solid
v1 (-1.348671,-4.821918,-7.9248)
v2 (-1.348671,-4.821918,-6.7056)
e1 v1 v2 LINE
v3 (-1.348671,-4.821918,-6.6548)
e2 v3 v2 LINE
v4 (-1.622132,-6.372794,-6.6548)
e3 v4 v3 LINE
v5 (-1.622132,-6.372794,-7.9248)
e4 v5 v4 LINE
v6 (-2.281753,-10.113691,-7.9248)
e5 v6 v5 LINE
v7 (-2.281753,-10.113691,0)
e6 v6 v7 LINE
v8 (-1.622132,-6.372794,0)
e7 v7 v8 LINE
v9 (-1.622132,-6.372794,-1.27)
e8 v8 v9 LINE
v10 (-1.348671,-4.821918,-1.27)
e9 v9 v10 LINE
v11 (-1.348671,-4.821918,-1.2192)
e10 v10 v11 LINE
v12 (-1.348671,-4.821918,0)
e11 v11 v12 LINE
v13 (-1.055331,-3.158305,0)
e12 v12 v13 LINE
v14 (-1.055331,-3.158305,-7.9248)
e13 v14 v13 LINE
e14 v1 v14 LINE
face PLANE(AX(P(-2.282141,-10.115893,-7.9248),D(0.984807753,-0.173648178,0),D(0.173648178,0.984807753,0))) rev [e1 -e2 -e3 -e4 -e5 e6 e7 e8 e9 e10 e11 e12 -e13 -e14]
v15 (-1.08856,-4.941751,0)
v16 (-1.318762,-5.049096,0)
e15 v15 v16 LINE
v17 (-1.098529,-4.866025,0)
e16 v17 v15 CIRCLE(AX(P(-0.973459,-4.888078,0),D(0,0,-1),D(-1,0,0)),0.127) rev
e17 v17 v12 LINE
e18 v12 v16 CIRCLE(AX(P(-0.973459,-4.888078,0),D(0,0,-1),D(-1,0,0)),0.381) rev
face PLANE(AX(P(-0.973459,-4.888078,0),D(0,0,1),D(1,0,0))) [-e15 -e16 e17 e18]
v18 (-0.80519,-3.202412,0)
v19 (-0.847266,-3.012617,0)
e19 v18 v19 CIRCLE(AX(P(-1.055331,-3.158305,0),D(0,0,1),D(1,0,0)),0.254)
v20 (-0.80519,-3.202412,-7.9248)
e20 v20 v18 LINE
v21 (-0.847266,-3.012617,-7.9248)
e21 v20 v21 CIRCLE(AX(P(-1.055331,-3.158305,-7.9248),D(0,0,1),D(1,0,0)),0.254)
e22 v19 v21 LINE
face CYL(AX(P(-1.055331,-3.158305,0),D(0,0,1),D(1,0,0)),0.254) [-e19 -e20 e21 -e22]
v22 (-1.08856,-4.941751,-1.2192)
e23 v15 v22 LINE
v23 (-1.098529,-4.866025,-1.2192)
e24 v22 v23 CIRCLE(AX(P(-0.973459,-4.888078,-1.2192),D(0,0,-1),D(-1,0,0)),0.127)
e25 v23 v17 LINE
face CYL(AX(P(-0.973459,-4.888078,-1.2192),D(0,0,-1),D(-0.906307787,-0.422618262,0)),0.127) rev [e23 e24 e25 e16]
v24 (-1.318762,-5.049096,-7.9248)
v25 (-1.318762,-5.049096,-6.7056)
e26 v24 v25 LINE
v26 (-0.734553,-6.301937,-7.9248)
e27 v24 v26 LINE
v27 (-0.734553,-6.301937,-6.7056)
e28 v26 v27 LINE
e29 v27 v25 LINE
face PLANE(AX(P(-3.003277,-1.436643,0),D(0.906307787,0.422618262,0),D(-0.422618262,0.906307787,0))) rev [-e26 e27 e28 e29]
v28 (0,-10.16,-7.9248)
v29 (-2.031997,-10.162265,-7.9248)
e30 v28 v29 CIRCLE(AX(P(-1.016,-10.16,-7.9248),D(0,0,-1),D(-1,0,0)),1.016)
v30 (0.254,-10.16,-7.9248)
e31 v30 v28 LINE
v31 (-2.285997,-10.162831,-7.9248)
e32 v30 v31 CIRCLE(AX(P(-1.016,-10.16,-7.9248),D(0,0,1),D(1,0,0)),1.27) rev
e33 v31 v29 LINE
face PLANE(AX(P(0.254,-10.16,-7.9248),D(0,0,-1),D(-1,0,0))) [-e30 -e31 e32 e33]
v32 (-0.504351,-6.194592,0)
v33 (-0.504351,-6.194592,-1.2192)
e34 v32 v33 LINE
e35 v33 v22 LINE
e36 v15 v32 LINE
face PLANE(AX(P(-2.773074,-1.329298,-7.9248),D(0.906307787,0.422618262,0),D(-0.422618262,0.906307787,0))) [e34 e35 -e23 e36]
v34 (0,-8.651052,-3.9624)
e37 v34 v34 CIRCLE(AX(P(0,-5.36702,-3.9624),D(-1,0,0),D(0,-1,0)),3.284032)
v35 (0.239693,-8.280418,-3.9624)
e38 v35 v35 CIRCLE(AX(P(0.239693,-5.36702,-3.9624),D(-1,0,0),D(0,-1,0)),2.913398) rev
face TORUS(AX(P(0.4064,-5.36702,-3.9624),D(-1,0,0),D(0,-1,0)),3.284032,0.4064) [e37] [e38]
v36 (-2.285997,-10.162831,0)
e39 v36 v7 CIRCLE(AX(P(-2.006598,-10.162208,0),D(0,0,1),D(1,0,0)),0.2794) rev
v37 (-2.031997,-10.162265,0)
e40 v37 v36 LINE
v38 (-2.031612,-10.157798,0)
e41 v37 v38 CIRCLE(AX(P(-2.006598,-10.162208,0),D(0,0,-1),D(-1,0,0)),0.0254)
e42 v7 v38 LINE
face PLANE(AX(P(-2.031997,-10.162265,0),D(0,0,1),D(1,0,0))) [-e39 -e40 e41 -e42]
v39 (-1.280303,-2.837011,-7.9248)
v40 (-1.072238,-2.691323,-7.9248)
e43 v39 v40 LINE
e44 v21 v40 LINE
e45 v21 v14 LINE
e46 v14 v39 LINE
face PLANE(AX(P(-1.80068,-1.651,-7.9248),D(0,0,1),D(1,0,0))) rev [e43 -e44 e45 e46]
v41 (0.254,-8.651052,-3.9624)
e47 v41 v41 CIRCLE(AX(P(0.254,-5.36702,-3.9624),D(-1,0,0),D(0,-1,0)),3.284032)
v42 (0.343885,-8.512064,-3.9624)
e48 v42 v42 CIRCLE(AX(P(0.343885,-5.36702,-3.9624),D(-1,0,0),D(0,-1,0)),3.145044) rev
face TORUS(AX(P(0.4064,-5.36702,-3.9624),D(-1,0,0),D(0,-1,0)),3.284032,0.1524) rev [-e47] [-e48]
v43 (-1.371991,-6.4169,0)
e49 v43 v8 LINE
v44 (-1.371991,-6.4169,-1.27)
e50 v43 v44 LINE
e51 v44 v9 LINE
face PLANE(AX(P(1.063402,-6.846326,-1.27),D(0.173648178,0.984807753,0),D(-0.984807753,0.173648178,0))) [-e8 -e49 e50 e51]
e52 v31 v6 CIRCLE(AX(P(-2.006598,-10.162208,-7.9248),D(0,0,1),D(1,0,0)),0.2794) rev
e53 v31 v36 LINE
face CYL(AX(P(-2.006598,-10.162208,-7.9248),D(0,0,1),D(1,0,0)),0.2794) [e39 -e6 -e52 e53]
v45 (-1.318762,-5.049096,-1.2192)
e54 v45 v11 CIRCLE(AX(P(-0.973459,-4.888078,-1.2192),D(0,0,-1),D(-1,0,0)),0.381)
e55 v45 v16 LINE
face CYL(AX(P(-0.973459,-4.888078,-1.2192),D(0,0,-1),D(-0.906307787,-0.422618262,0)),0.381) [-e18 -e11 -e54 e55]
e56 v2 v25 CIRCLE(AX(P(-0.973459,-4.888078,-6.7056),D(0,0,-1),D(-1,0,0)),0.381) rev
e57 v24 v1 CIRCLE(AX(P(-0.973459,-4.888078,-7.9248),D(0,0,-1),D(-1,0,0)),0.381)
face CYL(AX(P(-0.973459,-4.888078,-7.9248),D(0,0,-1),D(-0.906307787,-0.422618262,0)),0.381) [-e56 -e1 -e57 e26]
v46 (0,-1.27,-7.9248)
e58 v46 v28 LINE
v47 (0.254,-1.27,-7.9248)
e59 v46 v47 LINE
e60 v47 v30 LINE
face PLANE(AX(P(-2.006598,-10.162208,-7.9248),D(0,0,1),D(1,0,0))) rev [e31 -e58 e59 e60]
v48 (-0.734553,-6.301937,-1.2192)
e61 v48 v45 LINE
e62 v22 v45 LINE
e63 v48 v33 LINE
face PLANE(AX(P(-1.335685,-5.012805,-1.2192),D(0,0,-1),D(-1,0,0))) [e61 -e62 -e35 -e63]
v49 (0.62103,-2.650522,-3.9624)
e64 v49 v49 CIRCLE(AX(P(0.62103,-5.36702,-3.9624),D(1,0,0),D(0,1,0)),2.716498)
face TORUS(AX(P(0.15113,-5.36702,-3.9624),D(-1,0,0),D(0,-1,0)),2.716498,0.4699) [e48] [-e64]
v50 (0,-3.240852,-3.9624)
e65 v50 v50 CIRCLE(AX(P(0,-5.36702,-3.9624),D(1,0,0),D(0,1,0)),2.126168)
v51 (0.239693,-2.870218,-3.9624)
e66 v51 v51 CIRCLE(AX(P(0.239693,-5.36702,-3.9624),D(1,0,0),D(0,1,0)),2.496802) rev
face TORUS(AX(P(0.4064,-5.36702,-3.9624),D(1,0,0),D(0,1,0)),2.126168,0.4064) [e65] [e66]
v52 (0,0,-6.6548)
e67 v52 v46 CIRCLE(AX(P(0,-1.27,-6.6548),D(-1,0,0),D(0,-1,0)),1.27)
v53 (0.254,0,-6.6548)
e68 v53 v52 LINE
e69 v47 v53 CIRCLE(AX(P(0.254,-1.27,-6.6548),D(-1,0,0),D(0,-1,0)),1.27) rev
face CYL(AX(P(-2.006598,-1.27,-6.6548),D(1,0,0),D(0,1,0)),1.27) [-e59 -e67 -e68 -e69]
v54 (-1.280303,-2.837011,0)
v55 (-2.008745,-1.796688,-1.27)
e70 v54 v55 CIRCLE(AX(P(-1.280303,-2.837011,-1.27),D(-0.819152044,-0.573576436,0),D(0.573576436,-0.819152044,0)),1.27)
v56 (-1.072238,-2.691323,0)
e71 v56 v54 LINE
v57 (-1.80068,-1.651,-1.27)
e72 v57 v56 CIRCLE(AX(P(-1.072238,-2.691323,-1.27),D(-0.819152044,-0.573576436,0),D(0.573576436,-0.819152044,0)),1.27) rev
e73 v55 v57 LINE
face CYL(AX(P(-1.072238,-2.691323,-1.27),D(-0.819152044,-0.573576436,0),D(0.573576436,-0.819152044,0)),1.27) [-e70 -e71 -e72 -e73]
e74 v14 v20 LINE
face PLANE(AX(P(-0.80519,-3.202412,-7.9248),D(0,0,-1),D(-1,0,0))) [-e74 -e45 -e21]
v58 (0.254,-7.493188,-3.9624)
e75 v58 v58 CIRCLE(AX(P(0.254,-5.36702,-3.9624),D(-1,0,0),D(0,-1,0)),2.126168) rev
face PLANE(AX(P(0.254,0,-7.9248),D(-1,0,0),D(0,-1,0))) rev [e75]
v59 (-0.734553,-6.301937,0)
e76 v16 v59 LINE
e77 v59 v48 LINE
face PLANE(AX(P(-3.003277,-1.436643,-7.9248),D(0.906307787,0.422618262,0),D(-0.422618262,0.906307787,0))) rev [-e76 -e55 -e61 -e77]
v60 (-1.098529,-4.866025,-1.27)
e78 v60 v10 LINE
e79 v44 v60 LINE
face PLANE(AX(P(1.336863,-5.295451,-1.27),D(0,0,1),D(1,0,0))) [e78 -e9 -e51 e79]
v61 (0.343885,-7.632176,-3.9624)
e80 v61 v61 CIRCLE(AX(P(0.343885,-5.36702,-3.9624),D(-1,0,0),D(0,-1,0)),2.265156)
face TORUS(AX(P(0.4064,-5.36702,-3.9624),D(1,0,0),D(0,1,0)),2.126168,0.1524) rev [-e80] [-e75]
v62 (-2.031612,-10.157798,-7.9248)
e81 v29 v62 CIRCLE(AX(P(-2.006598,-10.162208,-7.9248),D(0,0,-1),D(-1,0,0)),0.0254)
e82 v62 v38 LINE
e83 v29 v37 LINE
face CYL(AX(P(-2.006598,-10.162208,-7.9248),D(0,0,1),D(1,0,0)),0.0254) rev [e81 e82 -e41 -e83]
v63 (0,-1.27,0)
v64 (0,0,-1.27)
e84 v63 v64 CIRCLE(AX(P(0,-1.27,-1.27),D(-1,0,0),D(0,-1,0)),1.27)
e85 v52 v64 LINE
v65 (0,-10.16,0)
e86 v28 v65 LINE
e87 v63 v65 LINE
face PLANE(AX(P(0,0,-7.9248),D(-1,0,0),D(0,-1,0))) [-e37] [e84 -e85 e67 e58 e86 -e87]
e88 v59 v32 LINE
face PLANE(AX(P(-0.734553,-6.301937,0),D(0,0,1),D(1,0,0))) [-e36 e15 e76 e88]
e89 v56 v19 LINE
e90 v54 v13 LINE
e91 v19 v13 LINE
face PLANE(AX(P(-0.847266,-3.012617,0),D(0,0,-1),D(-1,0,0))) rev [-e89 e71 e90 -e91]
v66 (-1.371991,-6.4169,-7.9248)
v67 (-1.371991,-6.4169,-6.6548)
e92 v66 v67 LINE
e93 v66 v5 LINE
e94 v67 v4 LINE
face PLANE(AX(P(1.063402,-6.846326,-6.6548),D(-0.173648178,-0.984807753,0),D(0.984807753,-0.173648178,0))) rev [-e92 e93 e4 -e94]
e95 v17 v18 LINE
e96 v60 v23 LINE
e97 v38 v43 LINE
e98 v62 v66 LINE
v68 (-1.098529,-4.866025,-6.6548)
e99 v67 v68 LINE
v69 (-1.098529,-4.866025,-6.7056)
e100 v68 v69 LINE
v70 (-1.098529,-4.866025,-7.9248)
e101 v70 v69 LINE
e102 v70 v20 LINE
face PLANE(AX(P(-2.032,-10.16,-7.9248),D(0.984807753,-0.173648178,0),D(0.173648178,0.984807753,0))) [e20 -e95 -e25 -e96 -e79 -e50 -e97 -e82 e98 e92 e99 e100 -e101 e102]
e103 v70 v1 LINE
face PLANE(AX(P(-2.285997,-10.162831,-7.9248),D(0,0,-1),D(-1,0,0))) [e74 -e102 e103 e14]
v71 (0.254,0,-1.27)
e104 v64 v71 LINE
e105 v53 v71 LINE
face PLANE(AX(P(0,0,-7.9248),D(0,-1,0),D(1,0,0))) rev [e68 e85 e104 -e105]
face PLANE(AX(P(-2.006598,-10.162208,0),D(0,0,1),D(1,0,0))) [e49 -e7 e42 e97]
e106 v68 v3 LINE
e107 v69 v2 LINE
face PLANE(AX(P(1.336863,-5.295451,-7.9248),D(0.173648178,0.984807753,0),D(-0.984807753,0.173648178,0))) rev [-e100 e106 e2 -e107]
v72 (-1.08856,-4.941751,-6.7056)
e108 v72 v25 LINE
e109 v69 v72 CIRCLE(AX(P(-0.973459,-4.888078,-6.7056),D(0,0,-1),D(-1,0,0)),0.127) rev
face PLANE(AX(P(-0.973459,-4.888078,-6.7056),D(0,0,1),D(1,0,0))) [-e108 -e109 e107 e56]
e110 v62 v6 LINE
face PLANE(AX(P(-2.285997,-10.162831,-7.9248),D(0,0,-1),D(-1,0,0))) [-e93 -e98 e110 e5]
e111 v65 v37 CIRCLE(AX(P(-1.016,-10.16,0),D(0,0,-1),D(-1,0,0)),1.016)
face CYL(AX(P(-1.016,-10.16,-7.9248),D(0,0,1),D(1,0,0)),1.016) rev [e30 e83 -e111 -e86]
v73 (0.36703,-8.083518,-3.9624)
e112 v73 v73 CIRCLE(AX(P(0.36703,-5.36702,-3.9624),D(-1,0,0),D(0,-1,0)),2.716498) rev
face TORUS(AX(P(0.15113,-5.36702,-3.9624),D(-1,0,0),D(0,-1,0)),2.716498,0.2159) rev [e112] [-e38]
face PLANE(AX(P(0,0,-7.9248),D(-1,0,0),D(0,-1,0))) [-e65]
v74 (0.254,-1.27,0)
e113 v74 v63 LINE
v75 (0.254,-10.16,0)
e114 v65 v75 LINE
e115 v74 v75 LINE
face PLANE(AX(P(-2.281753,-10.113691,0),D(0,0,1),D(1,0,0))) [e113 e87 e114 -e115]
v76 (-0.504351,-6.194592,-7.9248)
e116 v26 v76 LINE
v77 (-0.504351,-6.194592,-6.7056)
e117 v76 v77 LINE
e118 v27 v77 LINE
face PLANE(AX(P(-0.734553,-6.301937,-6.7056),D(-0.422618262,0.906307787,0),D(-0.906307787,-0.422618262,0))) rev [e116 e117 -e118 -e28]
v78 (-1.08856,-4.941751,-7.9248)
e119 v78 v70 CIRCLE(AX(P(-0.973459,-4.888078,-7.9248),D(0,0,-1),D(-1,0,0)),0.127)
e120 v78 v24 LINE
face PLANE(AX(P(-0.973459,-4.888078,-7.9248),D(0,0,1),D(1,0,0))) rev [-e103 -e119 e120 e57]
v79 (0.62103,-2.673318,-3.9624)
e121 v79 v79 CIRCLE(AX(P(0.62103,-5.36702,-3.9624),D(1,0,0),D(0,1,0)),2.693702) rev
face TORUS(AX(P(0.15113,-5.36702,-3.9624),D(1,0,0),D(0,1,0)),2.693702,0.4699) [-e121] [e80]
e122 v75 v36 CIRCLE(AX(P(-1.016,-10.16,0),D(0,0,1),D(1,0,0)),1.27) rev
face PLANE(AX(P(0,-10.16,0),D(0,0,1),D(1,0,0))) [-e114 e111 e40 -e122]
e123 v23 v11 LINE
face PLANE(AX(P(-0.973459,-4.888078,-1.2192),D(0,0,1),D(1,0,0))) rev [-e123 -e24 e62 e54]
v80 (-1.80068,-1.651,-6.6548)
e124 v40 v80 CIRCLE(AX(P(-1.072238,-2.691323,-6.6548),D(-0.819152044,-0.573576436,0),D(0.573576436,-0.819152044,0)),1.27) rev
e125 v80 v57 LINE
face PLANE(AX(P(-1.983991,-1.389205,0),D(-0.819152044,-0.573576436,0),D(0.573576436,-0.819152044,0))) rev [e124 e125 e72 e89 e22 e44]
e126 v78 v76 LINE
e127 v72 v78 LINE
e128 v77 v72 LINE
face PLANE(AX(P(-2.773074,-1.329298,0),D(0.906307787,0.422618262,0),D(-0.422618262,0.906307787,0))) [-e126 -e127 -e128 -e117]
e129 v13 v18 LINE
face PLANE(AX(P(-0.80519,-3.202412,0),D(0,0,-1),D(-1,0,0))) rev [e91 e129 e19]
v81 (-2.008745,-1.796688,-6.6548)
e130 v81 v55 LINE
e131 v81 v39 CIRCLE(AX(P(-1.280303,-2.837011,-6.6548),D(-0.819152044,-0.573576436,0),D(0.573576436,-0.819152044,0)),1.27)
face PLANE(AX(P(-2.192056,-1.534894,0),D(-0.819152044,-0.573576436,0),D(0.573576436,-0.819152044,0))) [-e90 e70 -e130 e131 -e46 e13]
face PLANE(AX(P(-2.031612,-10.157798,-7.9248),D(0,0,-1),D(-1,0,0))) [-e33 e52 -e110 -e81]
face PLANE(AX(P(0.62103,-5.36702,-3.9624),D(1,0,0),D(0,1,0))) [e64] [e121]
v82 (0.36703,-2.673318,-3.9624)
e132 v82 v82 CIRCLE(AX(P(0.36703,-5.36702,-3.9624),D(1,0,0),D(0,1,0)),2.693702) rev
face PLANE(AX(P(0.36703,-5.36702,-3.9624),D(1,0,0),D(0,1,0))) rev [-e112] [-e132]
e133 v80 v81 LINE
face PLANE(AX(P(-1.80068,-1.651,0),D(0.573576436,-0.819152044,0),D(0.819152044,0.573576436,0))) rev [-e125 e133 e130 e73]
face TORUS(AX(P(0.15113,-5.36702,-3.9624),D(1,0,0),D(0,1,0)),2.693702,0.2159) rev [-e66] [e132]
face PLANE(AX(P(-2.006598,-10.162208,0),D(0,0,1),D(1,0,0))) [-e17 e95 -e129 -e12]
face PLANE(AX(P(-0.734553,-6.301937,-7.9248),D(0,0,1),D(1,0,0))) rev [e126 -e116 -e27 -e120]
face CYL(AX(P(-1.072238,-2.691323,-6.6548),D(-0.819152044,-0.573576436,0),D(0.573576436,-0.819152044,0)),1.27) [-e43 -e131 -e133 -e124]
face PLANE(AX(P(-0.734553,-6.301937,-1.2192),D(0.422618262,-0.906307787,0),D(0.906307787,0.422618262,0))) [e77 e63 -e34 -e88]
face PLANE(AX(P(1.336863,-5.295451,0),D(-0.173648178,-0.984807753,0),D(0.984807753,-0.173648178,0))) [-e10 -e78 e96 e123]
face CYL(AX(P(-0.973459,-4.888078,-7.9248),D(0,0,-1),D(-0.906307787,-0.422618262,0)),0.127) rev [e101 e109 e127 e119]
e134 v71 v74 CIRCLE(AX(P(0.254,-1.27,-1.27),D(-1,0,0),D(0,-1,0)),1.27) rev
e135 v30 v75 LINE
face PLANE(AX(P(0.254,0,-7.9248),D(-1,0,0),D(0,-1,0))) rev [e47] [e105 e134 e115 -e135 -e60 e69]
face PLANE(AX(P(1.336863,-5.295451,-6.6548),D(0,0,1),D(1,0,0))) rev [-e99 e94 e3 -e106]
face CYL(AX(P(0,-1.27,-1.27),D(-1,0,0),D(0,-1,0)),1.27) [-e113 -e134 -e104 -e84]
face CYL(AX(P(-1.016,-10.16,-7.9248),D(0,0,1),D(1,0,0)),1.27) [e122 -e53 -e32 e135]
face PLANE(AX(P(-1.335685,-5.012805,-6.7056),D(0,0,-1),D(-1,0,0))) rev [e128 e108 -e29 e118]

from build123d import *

# Parameters (mm, degrees)
BASE_FLANGE1_START  = -7.9248
BASE_FLANGE1_DEPTH  = 7.9248
EDGE_FLANGE1_START  = -7.9248
EDGE_FLANGE1_DEPTH  = 7.9248
FILLET1_R           = 1.27
CUT_EXTRUDE1_REACH  = 16.094
SKETCH9_W           = 1.27
SKETCH9_H           = 1.5748
EDGE_FLANGE2_DEPTH  = 1.2192
SKETCH13_R          = 3.175
SKETCH13_R_2        = 2.2352
BOSS_EXTRUDE1_DEPTH = 0.36703
FILLET2_R           = 0.4699
FILLET3_R           = 0.1524


# Read off the part's stored shape, not the designer's step: Base-Flange1, Edge-Flange1, SurfaceCut2
# Sheet-metal steps are written as plain solids
with BuildPart() as part:
    # Base-Flange1 outline → Base-Flange1 (new body)
    with BuildSketch(Plane.XY.offset(BASE_FLANGE1_START)):
        with BuildLine():
            ThreePointArc((-2.031997476, -10.162264875), (-2.031903336, -10.160022702), (-2.031611656, -10.157797589))
            Line((-2.031611656, -10.157797589), (-0.805189502, -3.202411927))
            Line((-0.805189502, -3.202411927), (-1.055330671, -3.15830529))
            Line((-1.055330671, -3.15830529), (-2.281752825, -10.113690952))
            ThreePointArc((-2.281752825, -10.113690952), (-2.284961307, -10.138167189), (-2.285996844, -10.162831094))
            ThreePointArc((-2.285996844, -10.162831094), (-1.014584452, -11.429999211), (0.254, -10.16))
            Line((0.254, -10.16), (0.254, 0))
            Line((0.254, 0), (0, 0))
            Line((0, 0), (0, -10.16))
            ThreePointArc((0, -10.16), (-1.014867562, -11.175999369), (-2.031997476, -10.162264875))
        make_face()
    extrude(amount=BASE_FLANGE1_DEPTH)

    # Edge-Flange1 outline → Edge-Flange1 (add)
    with BuildSketch(Plane.XY.offset(EDGE_FLANGE1_START)):
        with BuildLine():
            Line((-1.055330671, -3.15830529), (-0.805189502, -3.202411927))
            ThreePointArc((-0.805189502, -3.202411927), (-0.807351486, -3.103329628), (-0.847266052, -3.012616875))
            Line((-0.847266052, -3.012616875), (-1.800680468, -1.650999977))
            Line((-1.800680468, -1.650999977), (-2.008745087, -1.796688392))
            Line((-2.008745087, -1.796688392), (-1.055330671, -3.15830529))
        make_face()
    extrude(amount=EDGE_FLANGE1_DEPTH)

    # Fillet1
    fillet1_edges = [part.edges().sort_by_distance(p)[0] for p in [
        (0.127, 0, -7.9248),
        (-1.904712777, -1.723844184, -7.9248),
        (-1.904712777, -1.723844184, 0),
        (0.127, 0, 0),
    ]]
    fillet(fillet1_edges, radius=FILLET1_R)

    # Sketch9 → Cut-Extrude1 (cut, up to next)
    with BuildSketch(Plane(origin=(-0.483406544, 0.085237616, 0), x_dir=(0, 0, 1), z_dir=(-0.9848077530122094, 0.1736481776669234, 0)), mode=Mode.PRIVATE) as cut_extrude1_sk1:
        with Locations((-7.2898, -5.770256905)):
            Rectangle(SKETCH9_W, SKETCH9_H)
    cut_extrude1_tool1 = extrude(cut_extrude1_sk1.sketch, amount=-CUT_EXTRUDE1_REACH, mode=Mode.PRIVATE) & part.part
    cut_extrude1 = cut_extrude1_tool1.solids().sort_by_distance((-1.485401, -5.597356, -7.2898))[0]
    add(cut_extrude1, mode=Mode.SUBTRACT)

    # Edge-Flange2 section (across the edge) → Edge-Flange2 (add)
    with BuildSketch(Plane(origin=(-1.10548278, -4.905459737, -6.7056), x_dir=(0.9063077870366494, 0.42261826174070094, 0), z_dir=(0, 0, -1))):
        with BuildLine():
            Line((-0.254, 0.040042946), (-0.254, 1.4224))
            Line((-0.254, 1.4224), (0, 1.4224))
            Line((0, 1.4224), (0, 0.040042946))
            ThreePointArc((0, 0.040042946), (0.005877947, 0.00185331), (0.02296769, -0.032801261))
            Line((0.02296769, -0.032801261), (-0.185096929, -0.178489676))
            ThreePointArc((-0.185096929, -0.178489676), (-0.236366158, -0.074525963), (-0.254, 0.040042946))
        make_face()
    edge_flange2 = extrude(amount=EDGE_FLANGE2_DEPTH)

    # Mirror1: Cut-Extrude1, Edge-Flange2 across plane
    add(cut_extrude1.mirror(Plane(origin=(0, 0, -3.9624), x_dir=(1, 0, 0), z_dir=(0, 0, -1))), mode=Mode.SUBTRACT)
    add(edge_flange2.mirror(Plane(origin=(0, 0, -3.9624), x_dir=(1, 0, 0), z_dir=(0, 0, -1))))

    # Sketch13 → Boss-Extrude1 (add)
    with BuildSketch(Plane(origin=(0.254, 0, 0), x_dir=(0, 0, -1), z_dir=(1, 0, 0))):
        with Locations(Location((3.9624, -5.36702, 0), (0, 0, 270))):
            Circle(SKETCH13_R)
        with Locations(Location((3.9624, -5.36702, 0), (0, 0, 90))):
            Circle(SKETCH13_R_2, mode=Mode.SUBTRACT)
    extrude(amount=BOSS_EXTRUDE1_DEPTH)

    # Fillet2
    # the kernel refuses this fillet: 0.4699 mm, written as the material it takes off along each edge
    with BuildSketch(Plane(origin=(0.62103, -5.36702, -3.9624), x_dir=(0, -1, 0), z_dir=(0, 0, 1))) as fillet2_piece_1:
        with BuildLine():
            CenterArc((2.716498339, -0.4699), FILLET2_R, 12.645543845, 77.354456155)
            Line((2.716498339, 0), (2.716498339, 0.009398))
            Line((2.716498339, 0.009398), (3.175, 0.009398))
            Line((3.175, 0.009398), (3.184398, 0))
            ThreePointArc((3.184398, 0), (3.184398, -0.183515), (3.184170033, -0.3649726))
            Line((3.184170033, -0.3649726), (3.175, -0.36703))
        make_face()
    revolve(axis=Axis((0.62103, -5.36702, -3.9624), (1, 0, 0)), mode=Mode.SUBTRACT)
    with BuildSketch(Plane(origin=(0.62103, -5.36702, -3.9624), x_dir=(0, 1, 0), z_dir=(0, 0, -1))) as fillet2_piece_2:
        with BuildLine():
            CenterArc((2.693701661, -0.4699), FILLET2_R, 90, 77.354456155)
            Line((2.2352, -0.36703), (2.226029967, -0.3649726))
            ThreePointArc((2.226029967, -0.3649726), (2.225802, -0.183515), (2.225802, 0))
            Line((2.225802, 0), (2.2352, 0.009398))
            Line((2.2352, 0.009398), (2.693701661, 0.009398))
            Line((2.693701661, 0.009398), (2.693701661, 0))
        make_face()
    revolve(axis=Axis((0.62103, -5.36702, -3.9624), (1, 0, 0)), mode=Mode.SUBTRACT)

    # Fillet3
    fillet3_edges = [part.edges().sort_by_distance(p)[0] for p in [
        (0.254, -2.19202, -3.9624),
        (0.254, -7.60222, -3.9624),
    ]]
    fillet(fillet3_edges, radius=FILLET3_R)

    # SurfaceCut2 outline → SurfaceCut2 (revolve, cut)
    with BuildSketch(Plane(origin=(0, -5.36702, -3.9624), x_dir=(0, 1, 0), z_dir=(0, 0, -1))):
        with BuildLine():
            Line((2.716498339, 0.36703), (2.693701661, 0.36703))
            ThreePointArc((2.693701661, 0.36703), (2.576458228, 0.332421995), (2.496802209, 0.239693061))
            ThreePointArc((2.496802209, 0.239693061), (2.346861467, 0.06514448), (2.126167946, 0))
            Line((2.126167946, 0), (3.284032054, 0))
            ThreePointArc((3.284032054, 0), (3.063338533, 0.06514448), (2.913397791, 0.239693061))
            ThreePointArc((2.913397791, 0.239693061), (2.833741772, 0.332421995), (2.716498339, 0.36703))
        make_face()
    revolve(axis=Axis((0, -5.36702, -3.9624), (1, 0, 0)), mode=Mode.SUBTRACT)


solid = part.part
